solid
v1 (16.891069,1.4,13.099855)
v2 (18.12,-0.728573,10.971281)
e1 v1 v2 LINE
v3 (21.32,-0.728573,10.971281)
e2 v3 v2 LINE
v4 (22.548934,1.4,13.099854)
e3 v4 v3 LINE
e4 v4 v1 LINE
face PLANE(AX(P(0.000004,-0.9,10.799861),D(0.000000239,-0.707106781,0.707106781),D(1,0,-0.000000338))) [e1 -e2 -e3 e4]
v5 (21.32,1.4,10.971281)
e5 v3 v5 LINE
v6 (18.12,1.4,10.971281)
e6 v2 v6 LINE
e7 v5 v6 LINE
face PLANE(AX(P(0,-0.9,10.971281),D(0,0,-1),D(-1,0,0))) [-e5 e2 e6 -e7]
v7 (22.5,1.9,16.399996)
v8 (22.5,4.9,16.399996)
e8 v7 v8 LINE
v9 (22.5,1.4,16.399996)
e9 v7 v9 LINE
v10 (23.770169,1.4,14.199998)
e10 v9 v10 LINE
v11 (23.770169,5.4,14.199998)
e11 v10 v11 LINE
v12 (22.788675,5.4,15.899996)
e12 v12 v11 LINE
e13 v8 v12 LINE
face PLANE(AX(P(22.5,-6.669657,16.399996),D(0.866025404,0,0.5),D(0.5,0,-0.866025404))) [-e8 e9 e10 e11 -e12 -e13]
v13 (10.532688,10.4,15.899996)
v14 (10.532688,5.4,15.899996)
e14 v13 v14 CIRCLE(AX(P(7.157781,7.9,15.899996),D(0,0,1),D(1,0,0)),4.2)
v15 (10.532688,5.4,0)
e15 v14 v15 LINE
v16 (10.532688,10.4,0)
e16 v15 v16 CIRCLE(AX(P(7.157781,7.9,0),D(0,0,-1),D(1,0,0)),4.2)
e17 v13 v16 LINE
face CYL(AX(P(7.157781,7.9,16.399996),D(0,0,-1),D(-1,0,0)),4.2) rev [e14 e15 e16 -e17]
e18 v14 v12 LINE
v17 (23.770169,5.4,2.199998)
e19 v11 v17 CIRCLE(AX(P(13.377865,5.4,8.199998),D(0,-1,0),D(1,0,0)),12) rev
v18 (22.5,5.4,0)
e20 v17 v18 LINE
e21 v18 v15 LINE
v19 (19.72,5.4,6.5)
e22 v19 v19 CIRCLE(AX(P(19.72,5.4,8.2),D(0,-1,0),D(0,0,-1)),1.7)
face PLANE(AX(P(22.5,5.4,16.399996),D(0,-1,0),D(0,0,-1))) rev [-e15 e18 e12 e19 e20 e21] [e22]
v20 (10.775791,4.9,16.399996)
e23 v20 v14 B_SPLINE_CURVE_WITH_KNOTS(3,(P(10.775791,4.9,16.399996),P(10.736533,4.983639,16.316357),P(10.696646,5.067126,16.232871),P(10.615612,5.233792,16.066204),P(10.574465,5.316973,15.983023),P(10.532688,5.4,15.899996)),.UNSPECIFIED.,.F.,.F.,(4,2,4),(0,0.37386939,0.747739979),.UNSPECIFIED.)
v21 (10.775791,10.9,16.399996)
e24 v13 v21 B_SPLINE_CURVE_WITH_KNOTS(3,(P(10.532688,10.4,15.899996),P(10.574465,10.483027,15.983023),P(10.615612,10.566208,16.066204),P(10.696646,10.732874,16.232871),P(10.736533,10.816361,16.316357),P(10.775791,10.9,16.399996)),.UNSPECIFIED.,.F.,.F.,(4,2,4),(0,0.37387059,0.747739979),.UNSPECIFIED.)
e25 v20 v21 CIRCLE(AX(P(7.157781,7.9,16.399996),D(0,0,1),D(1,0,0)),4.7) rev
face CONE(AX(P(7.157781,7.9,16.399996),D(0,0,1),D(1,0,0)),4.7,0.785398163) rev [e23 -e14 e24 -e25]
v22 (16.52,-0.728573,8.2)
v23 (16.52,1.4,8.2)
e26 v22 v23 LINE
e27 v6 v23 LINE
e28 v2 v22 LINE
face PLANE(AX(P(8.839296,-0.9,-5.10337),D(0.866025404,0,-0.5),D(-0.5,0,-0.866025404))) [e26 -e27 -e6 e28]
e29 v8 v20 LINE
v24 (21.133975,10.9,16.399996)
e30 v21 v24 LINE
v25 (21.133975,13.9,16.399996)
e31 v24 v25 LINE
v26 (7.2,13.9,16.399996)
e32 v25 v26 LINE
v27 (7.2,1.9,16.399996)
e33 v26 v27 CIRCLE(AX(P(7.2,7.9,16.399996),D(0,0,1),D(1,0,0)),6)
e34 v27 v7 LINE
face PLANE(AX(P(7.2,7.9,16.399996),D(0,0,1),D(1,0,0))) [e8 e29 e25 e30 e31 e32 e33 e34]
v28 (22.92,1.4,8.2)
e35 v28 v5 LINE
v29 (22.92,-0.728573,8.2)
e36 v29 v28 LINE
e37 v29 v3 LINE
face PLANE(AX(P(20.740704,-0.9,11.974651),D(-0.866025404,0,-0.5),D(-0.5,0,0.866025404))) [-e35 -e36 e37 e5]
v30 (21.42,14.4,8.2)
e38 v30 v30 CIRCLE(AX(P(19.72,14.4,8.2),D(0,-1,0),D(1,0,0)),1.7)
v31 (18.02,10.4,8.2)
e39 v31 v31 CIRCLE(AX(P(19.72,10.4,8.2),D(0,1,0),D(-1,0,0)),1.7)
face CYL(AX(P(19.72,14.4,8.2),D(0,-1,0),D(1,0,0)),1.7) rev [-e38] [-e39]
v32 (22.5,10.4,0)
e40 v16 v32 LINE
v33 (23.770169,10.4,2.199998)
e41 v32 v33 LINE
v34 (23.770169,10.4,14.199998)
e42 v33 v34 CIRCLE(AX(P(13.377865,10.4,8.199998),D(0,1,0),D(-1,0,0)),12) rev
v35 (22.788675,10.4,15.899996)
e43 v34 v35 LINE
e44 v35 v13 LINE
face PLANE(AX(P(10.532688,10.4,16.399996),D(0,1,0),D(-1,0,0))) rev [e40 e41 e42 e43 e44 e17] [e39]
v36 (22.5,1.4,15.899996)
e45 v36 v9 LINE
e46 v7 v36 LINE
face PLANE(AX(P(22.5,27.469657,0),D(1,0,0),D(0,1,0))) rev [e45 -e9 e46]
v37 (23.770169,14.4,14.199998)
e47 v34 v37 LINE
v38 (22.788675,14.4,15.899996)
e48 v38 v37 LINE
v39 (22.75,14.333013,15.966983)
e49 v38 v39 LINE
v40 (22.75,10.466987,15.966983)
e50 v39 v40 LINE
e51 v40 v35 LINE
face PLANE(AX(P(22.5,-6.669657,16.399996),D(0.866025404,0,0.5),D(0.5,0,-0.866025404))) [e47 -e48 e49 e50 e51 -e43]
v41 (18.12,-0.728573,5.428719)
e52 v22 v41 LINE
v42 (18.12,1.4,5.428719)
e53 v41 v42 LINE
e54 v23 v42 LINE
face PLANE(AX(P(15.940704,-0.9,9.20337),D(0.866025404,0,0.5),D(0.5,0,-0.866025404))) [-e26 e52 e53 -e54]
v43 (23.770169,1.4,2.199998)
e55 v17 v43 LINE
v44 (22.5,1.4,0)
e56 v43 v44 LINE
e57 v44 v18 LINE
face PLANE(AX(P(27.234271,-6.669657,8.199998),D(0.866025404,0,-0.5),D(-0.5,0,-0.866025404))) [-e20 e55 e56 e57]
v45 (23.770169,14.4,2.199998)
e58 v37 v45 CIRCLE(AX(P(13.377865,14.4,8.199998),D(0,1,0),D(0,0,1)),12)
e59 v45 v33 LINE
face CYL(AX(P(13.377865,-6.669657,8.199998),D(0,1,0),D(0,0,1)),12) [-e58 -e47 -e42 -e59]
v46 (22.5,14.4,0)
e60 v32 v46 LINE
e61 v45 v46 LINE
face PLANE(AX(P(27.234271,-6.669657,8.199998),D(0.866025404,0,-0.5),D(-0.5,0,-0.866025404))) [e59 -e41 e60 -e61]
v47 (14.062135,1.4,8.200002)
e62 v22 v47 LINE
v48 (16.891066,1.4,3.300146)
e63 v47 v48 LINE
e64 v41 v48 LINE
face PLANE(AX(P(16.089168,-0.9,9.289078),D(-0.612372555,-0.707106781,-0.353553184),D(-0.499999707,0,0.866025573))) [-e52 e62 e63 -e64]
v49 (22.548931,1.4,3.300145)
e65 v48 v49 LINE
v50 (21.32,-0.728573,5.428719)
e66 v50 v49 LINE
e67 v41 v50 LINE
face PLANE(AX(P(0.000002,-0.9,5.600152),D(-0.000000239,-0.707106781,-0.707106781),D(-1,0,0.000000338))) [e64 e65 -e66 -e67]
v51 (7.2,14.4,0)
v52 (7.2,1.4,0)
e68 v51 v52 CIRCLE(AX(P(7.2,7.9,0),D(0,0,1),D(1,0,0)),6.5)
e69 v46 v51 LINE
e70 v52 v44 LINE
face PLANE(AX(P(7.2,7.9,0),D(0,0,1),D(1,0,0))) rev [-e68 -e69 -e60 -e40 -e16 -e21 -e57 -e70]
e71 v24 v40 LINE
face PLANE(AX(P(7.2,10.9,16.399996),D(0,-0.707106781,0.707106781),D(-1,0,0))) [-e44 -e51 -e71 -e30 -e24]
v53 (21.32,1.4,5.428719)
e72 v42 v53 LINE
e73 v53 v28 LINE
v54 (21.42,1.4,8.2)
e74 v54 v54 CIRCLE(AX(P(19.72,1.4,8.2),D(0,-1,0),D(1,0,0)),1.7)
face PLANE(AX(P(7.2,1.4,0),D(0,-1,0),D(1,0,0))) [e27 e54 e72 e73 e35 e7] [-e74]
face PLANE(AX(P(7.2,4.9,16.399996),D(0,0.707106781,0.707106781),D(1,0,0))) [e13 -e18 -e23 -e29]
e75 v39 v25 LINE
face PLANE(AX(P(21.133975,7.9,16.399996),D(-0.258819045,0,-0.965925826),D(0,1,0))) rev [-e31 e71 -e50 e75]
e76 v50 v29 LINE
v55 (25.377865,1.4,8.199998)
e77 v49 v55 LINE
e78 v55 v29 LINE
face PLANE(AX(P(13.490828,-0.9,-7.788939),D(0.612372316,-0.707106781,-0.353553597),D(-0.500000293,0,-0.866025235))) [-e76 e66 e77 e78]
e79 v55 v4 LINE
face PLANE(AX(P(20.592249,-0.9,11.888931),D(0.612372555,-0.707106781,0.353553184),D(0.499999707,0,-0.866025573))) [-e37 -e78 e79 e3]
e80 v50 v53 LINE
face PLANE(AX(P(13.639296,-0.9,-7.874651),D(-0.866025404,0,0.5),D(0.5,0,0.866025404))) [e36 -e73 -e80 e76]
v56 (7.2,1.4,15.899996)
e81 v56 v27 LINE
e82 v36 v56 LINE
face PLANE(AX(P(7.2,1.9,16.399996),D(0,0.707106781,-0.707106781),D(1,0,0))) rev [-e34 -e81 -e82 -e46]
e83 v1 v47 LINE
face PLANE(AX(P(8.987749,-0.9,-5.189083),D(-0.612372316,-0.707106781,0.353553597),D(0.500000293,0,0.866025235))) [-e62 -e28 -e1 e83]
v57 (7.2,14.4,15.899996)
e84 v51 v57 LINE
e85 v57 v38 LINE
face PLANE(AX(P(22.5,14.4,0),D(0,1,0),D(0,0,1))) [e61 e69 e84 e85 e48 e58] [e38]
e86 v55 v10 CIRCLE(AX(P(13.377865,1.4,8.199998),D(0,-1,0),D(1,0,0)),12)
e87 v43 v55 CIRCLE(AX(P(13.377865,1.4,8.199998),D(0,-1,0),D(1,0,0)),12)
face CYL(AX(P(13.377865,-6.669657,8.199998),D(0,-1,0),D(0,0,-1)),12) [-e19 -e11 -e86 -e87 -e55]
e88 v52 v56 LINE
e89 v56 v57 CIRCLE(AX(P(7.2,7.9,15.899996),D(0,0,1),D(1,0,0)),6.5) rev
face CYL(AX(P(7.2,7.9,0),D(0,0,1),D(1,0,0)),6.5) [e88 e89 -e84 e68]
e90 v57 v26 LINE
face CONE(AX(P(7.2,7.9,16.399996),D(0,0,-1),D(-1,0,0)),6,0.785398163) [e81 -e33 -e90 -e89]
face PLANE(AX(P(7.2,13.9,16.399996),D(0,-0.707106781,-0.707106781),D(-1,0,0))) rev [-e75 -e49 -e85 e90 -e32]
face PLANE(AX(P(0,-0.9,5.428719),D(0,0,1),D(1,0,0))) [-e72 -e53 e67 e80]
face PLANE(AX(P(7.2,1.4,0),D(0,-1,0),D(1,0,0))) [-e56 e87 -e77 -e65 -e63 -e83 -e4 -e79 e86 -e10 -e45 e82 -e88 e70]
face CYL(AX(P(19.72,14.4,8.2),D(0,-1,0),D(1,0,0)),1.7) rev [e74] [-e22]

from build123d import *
from OCP.BRepFilletAPI import BRepFilletAPI_MakeChamfer

# Parameters (mm, degrees)
BOSS_EXTRUDE1_DEPTH     = 16.399996177
CUT_EXTRUDE1_DEPTH      = 32.345970628
CUT_EXTRUDE3_DEPTH      = 30.26106414
CUT_EXTRUDE3_DEPTH_BACK = 30.26106414
SKETCH4_R               = 1.7
BOSS_EXTRUDE2_START     = -4
BOSS_EXTRUDE2_DEPTH     = 4
FILLET1_R               = 12
CHAMFER1_SIZE           = 0.5
CHAMFER2_SIZE           = 0.5
CHAMFER2_SIZE2          = 1.366025404
MIRROR2_START           = 1.4
MIRROR2_DEPTH           = 9
CUT_EXTRUDE4_DEPTH      = 31.847364144
BOSS_EXTRUDE4_DEPTH     = 2.3
CHAMFER3_SIZE           = 2.3


# Read off the part's stored shape, not the designer's step: Mirror2
with BuildPart() as part:
    # Sketch1 → Boss-Extrude1 (new body)
    with BuildSketch(Plane.XY.offset(16.399996177)):
        with BuildLine():
            Line((7.2, 1.4), (22.5, 1.4))
            Line((22.5, 1.4), (22.5, 14.4))
            Line((22.5, 14.4), (7.2, 14.4))
            ThreePointArc((7.2, 14.4), (0.7, 7.9), (7.2, 1.4))
        make_face()
    extrude(amount=-BOSS_EXTRUDE1_DEPTH)

    # Sketch2 → Cut-Extrude1 (cut, through all)
    with BuildSketch(Plane(origin=(0, 0, 0), x_dir=(-1, 0, 0), z_dir=(0, 0, -1))):
        with BuildLine():
            Line((-22.5, 10.4), (-22.5, 5.4))
            Line((-22.5, 5.4), (-10.532688106, 5.4))
            ThreePointArc((-10.532688106, 5.4), (-2.9577807, 7.9), (-10.532688106, 10.4))
            Line((-10.532688106, 10.4), (-22.5, 10.4))
        make_face()
    extrude(amount=-CUT_EXTRUDE1_DEPTH, mode=Mode.SUBTRACT)

    # Sketch4 → Cut-Extrude3 (cut, two sides: drawn at the far end of the back side and taken through both)
    with BuildSketch(Plane.XZ.offset(-10.4).offset(-CUT_EXTRUDE3_DEPTH_BACK)):
        with Locations((19.72, 8.2)):
            Circle(SKETCH4_R)
    extrude(amount=CUT_EXTRUDE3_DEPTH + CUT_EXTRUDE3_DEPTH_BACK, mode=Mode.SUBTRACT)

    # Sketch5 → Boss-Extrude2 (add)
    with BuildSketch(Plane(origin=(0, 14.4, 0), x_dir=(1, 0, 0), z_dir=(0, 1, 0)).offset(BOSS_EXTRUDE2_START)):
        Polygon((22.5, 0), (22.5, -16.399996177), (27.234271104, -8.199998088), align=None)
    extrude(amount=BOSS_EXTRUDE2_DEPTH)

    # Fillet1
    fillet1_edges = [part.edges().sort_by_distance(p)[0] for p in [
        (27.234271104, 12.4, 8.199998088),
    ]]
    fillet(fillet1_edges, radius=FILLET1_R)

    # Chamfer1
    chamfer1_edges = [part.edges().sort_by_distance(p)[0] for p in [
        (2.9577807, 7.9, 16.399996177),
    ]]
    chamfer(chamfer1_edges, length=CHAMFER1_SIZE)

    # Chamfer2: one chamfer whose edges measure the first distance from different faces: ONE call of the kernel's chamfer builder (chamfer() names one face for all edges)
    chamfer2_edges_1 = [part.edges().sort_by_distance(p)[0] for p in [
        (22.5, 12.4, 16.399996177),
    ]]
    chamfer2_side_1 = [part.faces().sort_by_distance(p)[0] for p in [
        (23.135084744, 12.4, 15.299997133),
    ]]
    chamfer2_edges_2 = [part.edges().sort_by_distance(p)[0] for p in [
        (14.85, 1.4, 16.399996177),
        (0.7, 7.9, 16.399996177),
        (14.85, 14.4, 16.399996177),
        (16.818865224, 10.4, 16.399996177),
        (16.818865224, 5.4, 16.399996177),
    ]]
    chamfer2 = BRepFilletAPI_MakeChamfer(part.part.solid().wrapped)
    for e in chamfer2_edges_1:
        chamfer2.Add(CHAMFER2_SIZE, CHAMFER2_SIZE2, e.wrapped, chamfer2_side_1[0].wrapped)  # the first distance lies on this face
    for e in chamfer2_edges_2:
        chamfer2.Add(CHAMFER2_SIZE, e.wrapped)
    add(Compound.cast(chamfer2.Shape()), mode=Mode.REPLACE)

    # Mirror2 outline → Mirror2 (add)
    with BuildSketch(Plane(origin=(0, 0, 0), x_dir=(1, 0, 0), z_dir=(0, 1, 0)).offset(MIRROR2_START)):
        with BuildLine():
            ThreePointArc((23.770169489, -14.199998088), (25.377864643, -8.199998088), (23.770169489, -2.199998088))
            Line((23.770169489, -2.199998088), (22.5, 0))
            Line((22.5, 0), (22.5, -16.399996177))
            Line((22.5, -16.399996177), (23.770169489, -14.199998088))
        make_face()
    extrude(amount=MIRROR2_DEPTH)

    # Sketch7 → Cut-Extrude4 (cut, through all)
    with BuildSketch(Plane.ZY.offset(-22.5)):
        Polygon((0, 10.4), (0, 5.4), (15.899996177, 5.4), (16.399996177, 4.9), (16.399996177, 10.4), (15.899996177, 10.4), align=None)
    extrude(amount=-CUT_EXTRUDE4_DEPTH, mode=Mode.SUBTRACT)

    # Sketch9 → Boss-Extrude4 (add)
    with BuildSketch(Plane.XZ.offset(-1.4)):
        Polygon((16.891066023, 3.300146444), (22.548930666, 3.300144532), (25.377864643, 8.199998088), (22.548933977, 13.099853556), (16.891069334, 13.099855468), (14.062135357, 8.200001912), align=None)
        Polygon((21.32, 10.971281292), (18.12, 10.971281292), (16.52, 8.2), (18.12, 5.428718708), (21.32, 5.428718708), (22.92, 8.2), align=None, mode=Mode.SUBTRACT)
    extrude(amount=BOSS_EXTRUDE4_DEPTH)

    # Chamfer3
    # the kernel refuses this chamfer: 2.3 mm, written as the material it takes off along each edge
    with BuildSketch(Plane(origin=(19.591493499, -0.9, -1.822282904), x_dir=(0.023812122999065932, 0.9996219169112968, -0.013747946350707228), z_dir=(0.5000002926043912, 0, 0.8660252348491488))) as chamfer3_piece_1_section:
        Polygon((CHAMFER3_SIZE * 0.999621916911, CHAMFER3_SIZE * 0.0274958766106), (-CHAMFER3_SIZE * 0.0274958766106, CHAMFER3_SIZE * 0.999621916911), (0, 0), align=None)
    chamfer3_piece_1 = extrude(amount=17.487606388, mode=Mode.PRIVATE)
    chamfer3_piece_1 = split(chamfer3_piece_1, bisect_by=Plane(origin=(23.305279483, 1.4, 6.13003631), z_dir=(0, -1, 0)), keep=Keep.TOP, mode=Mode.PRIVATE)
    add(chamfer3_piece_1, mode=Mode.SUBTRACT)
    with BuildSketch(Plane(origin=(10.976195151, -0.9, 3.300148442), x_dir=(-9.290045060267903e-09, 0.9996219169112968, -0.027495876610584728), z_dir=(0.999999999999943, 0, -3.378704806423189e-07))) as chamfer3_piece_2_section:
        Polygon((CHAMFER3_SIZE * 0.999621916911, CHAMFER3_SIZE * 0.0274958766106), (-CHAMFER3_SIZE * 0.0274958766106, CHAMFER3_SIZE * 0.999621916911), (0, 0), align=None)
    chamfer3_piece_2 = extrude(amount=17.487606388, mode=Mode.PRIVATE)
    chamfer3_piece_2 = split(chamfer3_piece_2, bisect_by=Plane(origin=(19.719998601, 1.4, 4.060075043), z_dir=(0, -1, 0)), keep=Keep.TOP, mode=Mode.PRIVATE)
    add(chamfer3_piece_2, mode=Mode.SUBTRACT)
    with BuildSketch(Plane(origin=(11.104701651, -0.9, 13.322431346), x_dir=(-0.023812132289111273, 0.9996219169112968, -0.013747930259877354), z_dir=(0.49999970739555216, 0, -0.8660255727196295))) as chamfer3_piece_3_section:
        Polygon((CHAMFER3_SIZE * 0.999621916911, CHAMFER3_SIZE * 0.0274958766106), (-CHAMFER3_SIZE * 0.0274958766106, CHAMFER3_SIZE * 0.999621916911), (0, 0), align=None)
    chamfer3_piece_3 = extrude(amount=17.487606388, mode=Mode.PRIVATE)
    chamfer3_piece_3 = split(chamfer3_piece_3, bisect_by=Plane(origin=(16.134719118, 1.4, 6.130038733), z_dir=(0, -1, 0)), keep=Keep.TOP, mode=Mode.PRIVATE)
    add(chamfer3_piece_3, mode=Mode.SUBTRACT)
    with BuildSketch(Plane(origin=(19.848506501, -0.9, 18.222282904), x_dir=(-0.023812122999067282, 0.9996219169112966, 0.013747946350707963), z_dir=(-0.5000002926043904, 0, -0.8660252348491492))) as chamfer3_piece_4_section:
        Polygon((CHAMFER3_SIZE * 0.999621916911, CHAMFER3_SIZE * 0.0274958766106), (-CHAMFER3_SIZE * 0.0274958766106, CHAMFER3_SIZE * 0.999621916911), (0, 0), align=None)
    chamfer3_piece_4 = extrude(amount=17.487606388, mode=Mode.PRIVATE)
    chamfer3_piece_4 = split(chamfer3_piece_4, bisect_by=Plane(origin=(16.134720517, 1.4, 10.26996369), z_dir=(0, -1, 0)), keep=Keep.TOP, mode=Mode.PRIVATE)
    add(chamfer3_piece_4, mode=Mode.SUBTRACT)
    with BuildSketch(Plane(origin=(28.335298349, -0.9, 3.077568654), x_dir=(0.02381213228911159, 0.9996219169112966, 0.013747930259877545), z_dir=(-0.499999707395552, 0, 0.8660255727196297))) as chamfer3_piece_5_section:
        Polygon((CHAMFER3_SIZE * 0.999621916911, CHAMFER3_SIZE * 0.0274958766106), (-CHAMFER3_SIZE * 0.0274958766106, CHAMFER3_SIZE * 0.999621916911), (0, 0), align=None)
    chamfer3_piece_5 = extrude(amount=17.487606388, mode=Mode.PRIVATE)
    chamfer3_piece_5 = split(chamfer3_piece_5, bisect_by=Plane(origin=(23.305280882, 1.4, 10.269961267), z_dir=(0, -1, 0)), keep=Keep.TOP, mode=Mode.PRIVATE)
    add(chamfer3_piece_5, mode=Mode.SUBTRACT)
    with BuildSketch(Plane(origin=(28.463804849, -0.9, 13.099851558), x_dir=(9.290045031933457e-09, 0.9996219169112968, 0.027495876610584735), z_dir=(-0.9999999999999429, 0, 3.3787048064231847e-07))) as chamfer3_piece_6_section:
        Polygon((CHAMFER3_SIZE * 0.999621916911, CHAMFER3_SIZE * 0.0274958766106), (-CHAMFER3_SIZE * 0.0274958766106, CHAMFER3_SIZE * 0.999621916911), (0, 0), align=None)
    chamfer3_piece_6 = extrude(amount=17.487606388, mode=Mode.PRIVATE)
    chamfer3_piece_6 = split(chamfer3_piece_6, bisect_by=Plane(origin=(19.720001399, 1.4, 12.339924957), z_dir=(0, -1, 0)), keep=Keep.TOP, mode=Mode.PRIVATE)
    add(chamfer3_piece_6, mode=Mode.SUBTRACT)


solid = part.part
